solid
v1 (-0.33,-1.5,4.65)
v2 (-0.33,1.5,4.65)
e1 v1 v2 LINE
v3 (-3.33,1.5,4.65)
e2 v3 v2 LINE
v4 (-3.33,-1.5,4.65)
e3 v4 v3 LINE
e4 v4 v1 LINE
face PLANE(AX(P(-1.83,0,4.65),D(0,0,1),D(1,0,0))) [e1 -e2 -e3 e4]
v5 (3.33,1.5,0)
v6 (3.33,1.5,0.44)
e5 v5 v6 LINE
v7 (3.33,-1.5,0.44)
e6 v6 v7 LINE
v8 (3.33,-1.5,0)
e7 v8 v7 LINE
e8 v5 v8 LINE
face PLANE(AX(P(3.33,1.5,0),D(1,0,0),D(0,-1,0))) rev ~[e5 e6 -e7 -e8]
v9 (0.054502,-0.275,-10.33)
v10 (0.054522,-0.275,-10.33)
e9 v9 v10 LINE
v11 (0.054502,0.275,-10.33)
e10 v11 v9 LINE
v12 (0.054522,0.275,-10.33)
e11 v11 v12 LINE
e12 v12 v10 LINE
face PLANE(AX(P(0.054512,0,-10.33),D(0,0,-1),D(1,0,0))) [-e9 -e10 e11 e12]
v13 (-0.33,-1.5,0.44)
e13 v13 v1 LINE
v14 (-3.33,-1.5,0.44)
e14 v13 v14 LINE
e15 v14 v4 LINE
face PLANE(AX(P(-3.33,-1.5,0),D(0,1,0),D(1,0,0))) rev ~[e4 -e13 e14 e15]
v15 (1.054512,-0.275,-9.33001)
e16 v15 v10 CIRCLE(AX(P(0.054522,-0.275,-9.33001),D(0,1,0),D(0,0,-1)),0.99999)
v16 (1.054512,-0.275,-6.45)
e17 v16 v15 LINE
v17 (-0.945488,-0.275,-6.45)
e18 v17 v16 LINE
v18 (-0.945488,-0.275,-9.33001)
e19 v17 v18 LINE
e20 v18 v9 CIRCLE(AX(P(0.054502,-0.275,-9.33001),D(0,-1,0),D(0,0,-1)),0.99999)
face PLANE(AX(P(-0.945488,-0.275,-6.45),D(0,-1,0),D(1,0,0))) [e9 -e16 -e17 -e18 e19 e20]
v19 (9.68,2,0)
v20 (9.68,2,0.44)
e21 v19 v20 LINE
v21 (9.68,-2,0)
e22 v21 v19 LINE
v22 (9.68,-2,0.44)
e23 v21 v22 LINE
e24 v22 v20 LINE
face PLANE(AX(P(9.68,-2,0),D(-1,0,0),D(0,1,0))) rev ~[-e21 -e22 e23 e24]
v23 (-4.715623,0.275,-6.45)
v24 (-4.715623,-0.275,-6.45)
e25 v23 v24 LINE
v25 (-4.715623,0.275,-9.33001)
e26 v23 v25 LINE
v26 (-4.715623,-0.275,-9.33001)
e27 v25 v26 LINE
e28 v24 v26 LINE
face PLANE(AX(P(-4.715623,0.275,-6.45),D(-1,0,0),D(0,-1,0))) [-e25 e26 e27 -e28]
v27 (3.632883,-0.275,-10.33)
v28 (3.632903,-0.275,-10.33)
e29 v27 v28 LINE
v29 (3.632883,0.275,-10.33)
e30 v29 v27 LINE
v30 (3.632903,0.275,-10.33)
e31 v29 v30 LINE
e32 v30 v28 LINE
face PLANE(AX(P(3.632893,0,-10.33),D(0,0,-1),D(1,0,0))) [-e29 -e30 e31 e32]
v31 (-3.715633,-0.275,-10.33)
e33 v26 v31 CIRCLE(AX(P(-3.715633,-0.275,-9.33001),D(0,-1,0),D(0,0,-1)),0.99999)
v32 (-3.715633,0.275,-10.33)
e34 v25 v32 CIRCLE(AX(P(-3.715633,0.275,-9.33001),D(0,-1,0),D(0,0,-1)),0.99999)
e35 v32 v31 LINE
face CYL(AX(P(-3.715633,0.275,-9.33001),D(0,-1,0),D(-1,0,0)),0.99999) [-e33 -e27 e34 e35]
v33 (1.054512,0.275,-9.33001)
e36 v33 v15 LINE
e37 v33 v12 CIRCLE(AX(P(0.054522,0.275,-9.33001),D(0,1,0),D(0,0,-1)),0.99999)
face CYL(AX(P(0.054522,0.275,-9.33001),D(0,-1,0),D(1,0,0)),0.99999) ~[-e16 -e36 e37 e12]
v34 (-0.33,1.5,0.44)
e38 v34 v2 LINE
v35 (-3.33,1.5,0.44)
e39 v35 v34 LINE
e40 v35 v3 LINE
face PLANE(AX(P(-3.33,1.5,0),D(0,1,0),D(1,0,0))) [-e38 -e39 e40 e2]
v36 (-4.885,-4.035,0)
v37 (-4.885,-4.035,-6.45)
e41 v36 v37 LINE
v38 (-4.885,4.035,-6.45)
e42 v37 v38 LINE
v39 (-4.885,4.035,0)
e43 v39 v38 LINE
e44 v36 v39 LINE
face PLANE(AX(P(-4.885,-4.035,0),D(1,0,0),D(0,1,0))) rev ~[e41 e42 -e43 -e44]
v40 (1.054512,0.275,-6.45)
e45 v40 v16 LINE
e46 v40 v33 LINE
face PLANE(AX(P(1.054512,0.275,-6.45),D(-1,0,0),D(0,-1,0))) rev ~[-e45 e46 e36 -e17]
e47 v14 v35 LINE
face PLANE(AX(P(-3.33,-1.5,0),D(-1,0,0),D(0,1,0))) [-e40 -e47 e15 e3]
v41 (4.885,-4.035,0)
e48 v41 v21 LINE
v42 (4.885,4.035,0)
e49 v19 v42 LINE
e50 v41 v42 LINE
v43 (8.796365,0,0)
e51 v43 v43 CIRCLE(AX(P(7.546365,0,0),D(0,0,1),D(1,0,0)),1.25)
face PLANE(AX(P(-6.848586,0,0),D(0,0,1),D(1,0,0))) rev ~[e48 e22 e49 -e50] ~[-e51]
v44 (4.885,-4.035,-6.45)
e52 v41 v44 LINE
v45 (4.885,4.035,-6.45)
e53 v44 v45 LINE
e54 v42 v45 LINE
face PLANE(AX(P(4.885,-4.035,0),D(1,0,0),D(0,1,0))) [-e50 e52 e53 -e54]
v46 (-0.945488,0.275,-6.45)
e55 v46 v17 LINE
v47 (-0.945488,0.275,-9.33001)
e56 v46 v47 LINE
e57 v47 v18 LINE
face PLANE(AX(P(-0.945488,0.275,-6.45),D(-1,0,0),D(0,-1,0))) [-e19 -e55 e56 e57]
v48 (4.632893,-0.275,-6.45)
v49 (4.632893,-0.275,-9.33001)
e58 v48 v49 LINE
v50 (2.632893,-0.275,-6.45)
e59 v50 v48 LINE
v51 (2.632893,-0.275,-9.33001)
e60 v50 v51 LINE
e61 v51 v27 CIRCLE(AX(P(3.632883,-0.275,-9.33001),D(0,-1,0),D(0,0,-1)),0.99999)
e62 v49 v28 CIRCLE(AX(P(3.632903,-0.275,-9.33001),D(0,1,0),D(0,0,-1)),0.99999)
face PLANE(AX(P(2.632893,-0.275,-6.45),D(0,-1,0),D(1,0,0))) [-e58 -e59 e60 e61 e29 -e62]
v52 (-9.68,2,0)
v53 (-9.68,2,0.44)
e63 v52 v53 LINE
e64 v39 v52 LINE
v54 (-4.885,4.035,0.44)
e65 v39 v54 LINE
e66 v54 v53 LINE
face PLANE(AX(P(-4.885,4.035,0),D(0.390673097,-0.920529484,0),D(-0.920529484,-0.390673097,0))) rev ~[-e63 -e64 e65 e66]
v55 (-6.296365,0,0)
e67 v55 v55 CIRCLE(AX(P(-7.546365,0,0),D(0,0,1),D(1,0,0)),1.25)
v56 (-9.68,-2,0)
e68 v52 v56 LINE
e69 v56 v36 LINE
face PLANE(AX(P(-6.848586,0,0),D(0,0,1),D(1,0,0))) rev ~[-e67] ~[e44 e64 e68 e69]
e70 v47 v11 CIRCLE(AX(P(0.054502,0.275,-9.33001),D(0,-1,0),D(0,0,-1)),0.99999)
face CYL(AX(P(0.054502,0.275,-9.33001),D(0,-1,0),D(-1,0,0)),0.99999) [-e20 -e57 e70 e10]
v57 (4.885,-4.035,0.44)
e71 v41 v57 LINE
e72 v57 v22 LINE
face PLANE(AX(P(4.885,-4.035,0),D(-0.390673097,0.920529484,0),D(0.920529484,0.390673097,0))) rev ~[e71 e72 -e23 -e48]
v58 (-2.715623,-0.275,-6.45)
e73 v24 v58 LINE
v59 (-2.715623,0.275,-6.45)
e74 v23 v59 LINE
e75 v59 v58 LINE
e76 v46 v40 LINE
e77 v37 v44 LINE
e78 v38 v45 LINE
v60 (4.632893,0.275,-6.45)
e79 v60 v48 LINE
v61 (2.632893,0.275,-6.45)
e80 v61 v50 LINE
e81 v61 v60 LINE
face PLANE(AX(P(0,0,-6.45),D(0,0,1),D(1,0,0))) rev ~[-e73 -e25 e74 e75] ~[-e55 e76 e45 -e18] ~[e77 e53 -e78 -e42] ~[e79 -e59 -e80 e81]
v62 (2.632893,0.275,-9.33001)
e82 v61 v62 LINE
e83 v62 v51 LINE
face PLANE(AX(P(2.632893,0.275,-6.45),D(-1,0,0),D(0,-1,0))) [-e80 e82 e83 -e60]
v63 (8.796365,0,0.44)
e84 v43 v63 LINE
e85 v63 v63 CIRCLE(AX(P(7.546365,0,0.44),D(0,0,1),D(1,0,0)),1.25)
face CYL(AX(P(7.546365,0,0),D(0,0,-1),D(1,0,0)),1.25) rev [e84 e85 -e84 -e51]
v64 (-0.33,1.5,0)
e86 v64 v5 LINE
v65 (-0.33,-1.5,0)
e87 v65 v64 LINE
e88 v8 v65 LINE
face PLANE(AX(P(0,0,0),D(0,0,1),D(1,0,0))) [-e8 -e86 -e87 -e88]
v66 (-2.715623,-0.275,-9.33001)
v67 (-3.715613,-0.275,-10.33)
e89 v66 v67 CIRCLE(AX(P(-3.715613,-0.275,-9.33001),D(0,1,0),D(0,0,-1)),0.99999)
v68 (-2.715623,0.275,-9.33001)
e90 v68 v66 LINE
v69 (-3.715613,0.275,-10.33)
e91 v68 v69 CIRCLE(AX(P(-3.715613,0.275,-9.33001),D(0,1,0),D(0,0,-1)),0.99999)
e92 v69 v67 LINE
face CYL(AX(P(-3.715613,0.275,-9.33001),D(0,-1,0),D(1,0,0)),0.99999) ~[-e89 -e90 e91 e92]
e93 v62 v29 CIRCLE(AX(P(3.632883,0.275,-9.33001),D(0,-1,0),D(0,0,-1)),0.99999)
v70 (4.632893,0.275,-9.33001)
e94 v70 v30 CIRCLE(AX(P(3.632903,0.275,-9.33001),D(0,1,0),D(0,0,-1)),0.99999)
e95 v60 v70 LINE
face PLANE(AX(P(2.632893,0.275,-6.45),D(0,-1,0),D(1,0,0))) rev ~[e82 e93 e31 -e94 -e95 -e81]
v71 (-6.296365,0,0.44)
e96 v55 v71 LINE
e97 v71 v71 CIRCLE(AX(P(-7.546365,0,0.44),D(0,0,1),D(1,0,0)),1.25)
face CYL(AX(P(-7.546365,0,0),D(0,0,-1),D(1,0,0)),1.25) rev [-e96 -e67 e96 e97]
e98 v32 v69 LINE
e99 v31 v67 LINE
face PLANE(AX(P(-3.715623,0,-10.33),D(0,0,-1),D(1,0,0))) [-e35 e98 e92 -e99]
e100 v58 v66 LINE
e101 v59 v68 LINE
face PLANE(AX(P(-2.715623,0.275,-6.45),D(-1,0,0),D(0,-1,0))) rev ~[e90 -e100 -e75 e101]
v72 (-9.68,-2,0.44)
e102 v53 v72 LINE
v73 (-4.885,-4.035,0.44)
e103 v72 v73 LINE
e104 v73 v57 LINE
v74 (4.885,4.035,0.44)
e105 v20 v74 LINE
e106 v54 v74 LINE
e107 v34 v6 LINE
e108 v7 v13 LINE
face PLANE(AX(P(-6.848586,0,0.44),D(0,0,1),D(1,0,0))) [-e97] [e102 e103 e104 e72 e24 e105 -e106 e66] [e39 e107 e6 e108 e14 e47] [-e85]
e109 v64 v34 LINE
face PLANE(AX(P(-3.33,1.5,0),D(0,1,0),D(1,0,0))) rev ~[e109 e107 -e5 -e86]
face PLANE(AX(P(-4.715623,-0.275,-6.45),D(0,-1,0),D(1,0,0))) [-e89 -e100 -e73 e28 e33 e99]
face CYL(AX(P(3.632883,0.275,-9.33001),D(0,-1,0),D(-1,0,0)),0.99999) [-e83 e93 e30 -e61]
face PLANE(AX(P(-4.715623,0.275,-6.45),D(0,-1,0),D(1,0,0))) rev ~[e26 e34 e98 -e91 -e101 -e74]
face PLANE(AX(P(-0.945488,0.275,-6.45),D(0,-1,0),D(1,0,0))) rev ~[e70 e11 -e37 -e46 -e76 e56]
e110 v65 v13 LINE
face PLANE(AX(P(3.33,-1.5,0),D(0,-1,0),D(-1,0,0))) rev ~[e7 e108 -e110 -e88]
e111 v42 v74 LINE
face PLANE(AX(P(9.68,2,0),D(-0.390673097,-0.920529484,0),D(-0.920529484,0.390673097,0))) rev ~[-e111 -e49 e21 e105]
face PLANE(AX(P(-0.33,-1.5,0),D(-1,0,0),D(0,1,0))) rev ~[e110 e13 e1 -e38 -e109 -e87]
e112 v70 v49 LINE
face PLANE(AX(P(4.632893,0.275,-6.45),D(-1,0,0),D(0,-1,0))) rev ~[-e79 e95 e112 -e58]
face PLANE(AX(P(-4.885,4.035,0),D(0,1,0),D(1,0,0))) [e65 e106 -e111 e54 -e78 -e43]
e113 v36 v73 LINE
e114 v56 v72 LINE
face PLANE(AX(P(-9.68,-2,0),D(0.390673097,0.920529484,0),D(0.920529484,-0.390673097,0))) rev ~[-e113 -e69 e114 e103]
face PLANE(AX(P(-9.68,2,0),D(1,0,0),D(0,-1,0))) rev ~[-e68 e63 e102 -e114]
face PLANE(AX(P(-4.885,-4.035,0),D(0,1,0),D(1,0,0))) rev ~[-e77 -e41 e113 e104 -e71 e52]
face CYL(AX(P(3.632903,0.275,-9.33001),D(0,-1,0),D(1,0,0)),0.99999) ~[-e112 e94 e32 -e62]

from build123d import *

# Parameters (mm, degrees)
F0_W     = 3
F0_H     = 3
F1_DEPTH = 4.65
F0_W_2   = 9.77
F0_H_2   = 8.07
F0_W_3   = 3.66
F2_DEPTH = 6.45
F0_R     = 1.25
F3_DEPTH = 0.44
F4_W     = 2
F4_H     = 0.55
F5_DEPTH = 3.88
F6_R     = 0.99999


# Not quite as in the source:
# - a fillet or chamfer is up to 0.001 mm smaller than in the source, because OpenCascade refuses the exact size


with BuildPart() as f1:
    # F0 (on Top) → F1 (new body)
    with BuildSketch(Plane.XY):
        with Locations((-1.83, 0)):
            Rectangle(F0_W, F0_H)
    extrude(amount=F1_DEPTH)

    # F0 (on Top) → F2 (join)
    with BuildSketch(Plane.XY):
        Rectangle(F0_W_2, F0_H_2)
        Polygon((-3.33, -1.5), (-3.33, 1.5), (-0.33, 1.5), (3.33, 1.5), (3.33, -1.5), (-0.33, -1.5), align=None, mode=Mode.SUBTRACT)
        with Locations((1.5, 0)):
            Rectangle(F0_W_3, F0_H)
        with Locations((-1.83, 0)):
            Rectangle(F0_W, F0_H)
    extrude(amount=-F2_DEPTH)

    # F0 (on Top) → F3 (join)
    with BuildSketch(Plane.XY):
        Polygon((-4.885, -4.035), (-4.885, 4.035), (-9.68, 2), (-9.68, -2), align=None)
        with Locations((-7.5463647954, 0)):
            Circle(F0_R, mode=Mode.SUBTRACT)
        Rectangle(F0_W_2, F0_H_2)
        Polygon((-3.33, -1.5), (-3.33, 1.5), (-0.33, 1.5), (3.33, 1.5), (3.33, -1.5), (-0.33, -1.5), align=None, mode=Mode.SUBTRACT)
        Polygon((9.68, 2), (4.885, 4.035), (4.885, -4.035), (9.68, -2), align=None)
        with Locations((7.5463647954, 0)):
            Circle(F0_R, mode=Mode.SUBTRACT)
    extrude(amount=F3_DEPTH)

    # F4 (on face) → F5 (join)
    with BuildSketch(Plane(origin=(0, 0, -6.45), x_dir=(1, 0, 0), z_dir=(0, 0, -1))):
        with Locations((-3.7156233341, 0)):
            Rectangle(F4_W, F4_H)
        with Locations((0.0545115434, 0)):
            Rectangle(F4_W, F4_H)
        with Locations((3.6328930184, 0)):
            Rectangle(F4_W, F4_H)
    extrude(amount=F5_DEPTH)

    # F6 (radius 1 in the source; OpenCascade refuses exactly that, so slightly less here)
    f6_edges = [f1.edges().sort_by_distance(p)[0] for p in [
        (-2.715623, 0, -10.33),
        (-4.715623, 0, -10.33),
        (-0.945488, 0, -10.33),
        (1.054512, 0, -10.33),
        (2.632893, 0, -10.33),
        (4.632893, 0, -10.33),
    ]]
    fillet(f6_edges, radius=F6_R)


solid = f1.part
